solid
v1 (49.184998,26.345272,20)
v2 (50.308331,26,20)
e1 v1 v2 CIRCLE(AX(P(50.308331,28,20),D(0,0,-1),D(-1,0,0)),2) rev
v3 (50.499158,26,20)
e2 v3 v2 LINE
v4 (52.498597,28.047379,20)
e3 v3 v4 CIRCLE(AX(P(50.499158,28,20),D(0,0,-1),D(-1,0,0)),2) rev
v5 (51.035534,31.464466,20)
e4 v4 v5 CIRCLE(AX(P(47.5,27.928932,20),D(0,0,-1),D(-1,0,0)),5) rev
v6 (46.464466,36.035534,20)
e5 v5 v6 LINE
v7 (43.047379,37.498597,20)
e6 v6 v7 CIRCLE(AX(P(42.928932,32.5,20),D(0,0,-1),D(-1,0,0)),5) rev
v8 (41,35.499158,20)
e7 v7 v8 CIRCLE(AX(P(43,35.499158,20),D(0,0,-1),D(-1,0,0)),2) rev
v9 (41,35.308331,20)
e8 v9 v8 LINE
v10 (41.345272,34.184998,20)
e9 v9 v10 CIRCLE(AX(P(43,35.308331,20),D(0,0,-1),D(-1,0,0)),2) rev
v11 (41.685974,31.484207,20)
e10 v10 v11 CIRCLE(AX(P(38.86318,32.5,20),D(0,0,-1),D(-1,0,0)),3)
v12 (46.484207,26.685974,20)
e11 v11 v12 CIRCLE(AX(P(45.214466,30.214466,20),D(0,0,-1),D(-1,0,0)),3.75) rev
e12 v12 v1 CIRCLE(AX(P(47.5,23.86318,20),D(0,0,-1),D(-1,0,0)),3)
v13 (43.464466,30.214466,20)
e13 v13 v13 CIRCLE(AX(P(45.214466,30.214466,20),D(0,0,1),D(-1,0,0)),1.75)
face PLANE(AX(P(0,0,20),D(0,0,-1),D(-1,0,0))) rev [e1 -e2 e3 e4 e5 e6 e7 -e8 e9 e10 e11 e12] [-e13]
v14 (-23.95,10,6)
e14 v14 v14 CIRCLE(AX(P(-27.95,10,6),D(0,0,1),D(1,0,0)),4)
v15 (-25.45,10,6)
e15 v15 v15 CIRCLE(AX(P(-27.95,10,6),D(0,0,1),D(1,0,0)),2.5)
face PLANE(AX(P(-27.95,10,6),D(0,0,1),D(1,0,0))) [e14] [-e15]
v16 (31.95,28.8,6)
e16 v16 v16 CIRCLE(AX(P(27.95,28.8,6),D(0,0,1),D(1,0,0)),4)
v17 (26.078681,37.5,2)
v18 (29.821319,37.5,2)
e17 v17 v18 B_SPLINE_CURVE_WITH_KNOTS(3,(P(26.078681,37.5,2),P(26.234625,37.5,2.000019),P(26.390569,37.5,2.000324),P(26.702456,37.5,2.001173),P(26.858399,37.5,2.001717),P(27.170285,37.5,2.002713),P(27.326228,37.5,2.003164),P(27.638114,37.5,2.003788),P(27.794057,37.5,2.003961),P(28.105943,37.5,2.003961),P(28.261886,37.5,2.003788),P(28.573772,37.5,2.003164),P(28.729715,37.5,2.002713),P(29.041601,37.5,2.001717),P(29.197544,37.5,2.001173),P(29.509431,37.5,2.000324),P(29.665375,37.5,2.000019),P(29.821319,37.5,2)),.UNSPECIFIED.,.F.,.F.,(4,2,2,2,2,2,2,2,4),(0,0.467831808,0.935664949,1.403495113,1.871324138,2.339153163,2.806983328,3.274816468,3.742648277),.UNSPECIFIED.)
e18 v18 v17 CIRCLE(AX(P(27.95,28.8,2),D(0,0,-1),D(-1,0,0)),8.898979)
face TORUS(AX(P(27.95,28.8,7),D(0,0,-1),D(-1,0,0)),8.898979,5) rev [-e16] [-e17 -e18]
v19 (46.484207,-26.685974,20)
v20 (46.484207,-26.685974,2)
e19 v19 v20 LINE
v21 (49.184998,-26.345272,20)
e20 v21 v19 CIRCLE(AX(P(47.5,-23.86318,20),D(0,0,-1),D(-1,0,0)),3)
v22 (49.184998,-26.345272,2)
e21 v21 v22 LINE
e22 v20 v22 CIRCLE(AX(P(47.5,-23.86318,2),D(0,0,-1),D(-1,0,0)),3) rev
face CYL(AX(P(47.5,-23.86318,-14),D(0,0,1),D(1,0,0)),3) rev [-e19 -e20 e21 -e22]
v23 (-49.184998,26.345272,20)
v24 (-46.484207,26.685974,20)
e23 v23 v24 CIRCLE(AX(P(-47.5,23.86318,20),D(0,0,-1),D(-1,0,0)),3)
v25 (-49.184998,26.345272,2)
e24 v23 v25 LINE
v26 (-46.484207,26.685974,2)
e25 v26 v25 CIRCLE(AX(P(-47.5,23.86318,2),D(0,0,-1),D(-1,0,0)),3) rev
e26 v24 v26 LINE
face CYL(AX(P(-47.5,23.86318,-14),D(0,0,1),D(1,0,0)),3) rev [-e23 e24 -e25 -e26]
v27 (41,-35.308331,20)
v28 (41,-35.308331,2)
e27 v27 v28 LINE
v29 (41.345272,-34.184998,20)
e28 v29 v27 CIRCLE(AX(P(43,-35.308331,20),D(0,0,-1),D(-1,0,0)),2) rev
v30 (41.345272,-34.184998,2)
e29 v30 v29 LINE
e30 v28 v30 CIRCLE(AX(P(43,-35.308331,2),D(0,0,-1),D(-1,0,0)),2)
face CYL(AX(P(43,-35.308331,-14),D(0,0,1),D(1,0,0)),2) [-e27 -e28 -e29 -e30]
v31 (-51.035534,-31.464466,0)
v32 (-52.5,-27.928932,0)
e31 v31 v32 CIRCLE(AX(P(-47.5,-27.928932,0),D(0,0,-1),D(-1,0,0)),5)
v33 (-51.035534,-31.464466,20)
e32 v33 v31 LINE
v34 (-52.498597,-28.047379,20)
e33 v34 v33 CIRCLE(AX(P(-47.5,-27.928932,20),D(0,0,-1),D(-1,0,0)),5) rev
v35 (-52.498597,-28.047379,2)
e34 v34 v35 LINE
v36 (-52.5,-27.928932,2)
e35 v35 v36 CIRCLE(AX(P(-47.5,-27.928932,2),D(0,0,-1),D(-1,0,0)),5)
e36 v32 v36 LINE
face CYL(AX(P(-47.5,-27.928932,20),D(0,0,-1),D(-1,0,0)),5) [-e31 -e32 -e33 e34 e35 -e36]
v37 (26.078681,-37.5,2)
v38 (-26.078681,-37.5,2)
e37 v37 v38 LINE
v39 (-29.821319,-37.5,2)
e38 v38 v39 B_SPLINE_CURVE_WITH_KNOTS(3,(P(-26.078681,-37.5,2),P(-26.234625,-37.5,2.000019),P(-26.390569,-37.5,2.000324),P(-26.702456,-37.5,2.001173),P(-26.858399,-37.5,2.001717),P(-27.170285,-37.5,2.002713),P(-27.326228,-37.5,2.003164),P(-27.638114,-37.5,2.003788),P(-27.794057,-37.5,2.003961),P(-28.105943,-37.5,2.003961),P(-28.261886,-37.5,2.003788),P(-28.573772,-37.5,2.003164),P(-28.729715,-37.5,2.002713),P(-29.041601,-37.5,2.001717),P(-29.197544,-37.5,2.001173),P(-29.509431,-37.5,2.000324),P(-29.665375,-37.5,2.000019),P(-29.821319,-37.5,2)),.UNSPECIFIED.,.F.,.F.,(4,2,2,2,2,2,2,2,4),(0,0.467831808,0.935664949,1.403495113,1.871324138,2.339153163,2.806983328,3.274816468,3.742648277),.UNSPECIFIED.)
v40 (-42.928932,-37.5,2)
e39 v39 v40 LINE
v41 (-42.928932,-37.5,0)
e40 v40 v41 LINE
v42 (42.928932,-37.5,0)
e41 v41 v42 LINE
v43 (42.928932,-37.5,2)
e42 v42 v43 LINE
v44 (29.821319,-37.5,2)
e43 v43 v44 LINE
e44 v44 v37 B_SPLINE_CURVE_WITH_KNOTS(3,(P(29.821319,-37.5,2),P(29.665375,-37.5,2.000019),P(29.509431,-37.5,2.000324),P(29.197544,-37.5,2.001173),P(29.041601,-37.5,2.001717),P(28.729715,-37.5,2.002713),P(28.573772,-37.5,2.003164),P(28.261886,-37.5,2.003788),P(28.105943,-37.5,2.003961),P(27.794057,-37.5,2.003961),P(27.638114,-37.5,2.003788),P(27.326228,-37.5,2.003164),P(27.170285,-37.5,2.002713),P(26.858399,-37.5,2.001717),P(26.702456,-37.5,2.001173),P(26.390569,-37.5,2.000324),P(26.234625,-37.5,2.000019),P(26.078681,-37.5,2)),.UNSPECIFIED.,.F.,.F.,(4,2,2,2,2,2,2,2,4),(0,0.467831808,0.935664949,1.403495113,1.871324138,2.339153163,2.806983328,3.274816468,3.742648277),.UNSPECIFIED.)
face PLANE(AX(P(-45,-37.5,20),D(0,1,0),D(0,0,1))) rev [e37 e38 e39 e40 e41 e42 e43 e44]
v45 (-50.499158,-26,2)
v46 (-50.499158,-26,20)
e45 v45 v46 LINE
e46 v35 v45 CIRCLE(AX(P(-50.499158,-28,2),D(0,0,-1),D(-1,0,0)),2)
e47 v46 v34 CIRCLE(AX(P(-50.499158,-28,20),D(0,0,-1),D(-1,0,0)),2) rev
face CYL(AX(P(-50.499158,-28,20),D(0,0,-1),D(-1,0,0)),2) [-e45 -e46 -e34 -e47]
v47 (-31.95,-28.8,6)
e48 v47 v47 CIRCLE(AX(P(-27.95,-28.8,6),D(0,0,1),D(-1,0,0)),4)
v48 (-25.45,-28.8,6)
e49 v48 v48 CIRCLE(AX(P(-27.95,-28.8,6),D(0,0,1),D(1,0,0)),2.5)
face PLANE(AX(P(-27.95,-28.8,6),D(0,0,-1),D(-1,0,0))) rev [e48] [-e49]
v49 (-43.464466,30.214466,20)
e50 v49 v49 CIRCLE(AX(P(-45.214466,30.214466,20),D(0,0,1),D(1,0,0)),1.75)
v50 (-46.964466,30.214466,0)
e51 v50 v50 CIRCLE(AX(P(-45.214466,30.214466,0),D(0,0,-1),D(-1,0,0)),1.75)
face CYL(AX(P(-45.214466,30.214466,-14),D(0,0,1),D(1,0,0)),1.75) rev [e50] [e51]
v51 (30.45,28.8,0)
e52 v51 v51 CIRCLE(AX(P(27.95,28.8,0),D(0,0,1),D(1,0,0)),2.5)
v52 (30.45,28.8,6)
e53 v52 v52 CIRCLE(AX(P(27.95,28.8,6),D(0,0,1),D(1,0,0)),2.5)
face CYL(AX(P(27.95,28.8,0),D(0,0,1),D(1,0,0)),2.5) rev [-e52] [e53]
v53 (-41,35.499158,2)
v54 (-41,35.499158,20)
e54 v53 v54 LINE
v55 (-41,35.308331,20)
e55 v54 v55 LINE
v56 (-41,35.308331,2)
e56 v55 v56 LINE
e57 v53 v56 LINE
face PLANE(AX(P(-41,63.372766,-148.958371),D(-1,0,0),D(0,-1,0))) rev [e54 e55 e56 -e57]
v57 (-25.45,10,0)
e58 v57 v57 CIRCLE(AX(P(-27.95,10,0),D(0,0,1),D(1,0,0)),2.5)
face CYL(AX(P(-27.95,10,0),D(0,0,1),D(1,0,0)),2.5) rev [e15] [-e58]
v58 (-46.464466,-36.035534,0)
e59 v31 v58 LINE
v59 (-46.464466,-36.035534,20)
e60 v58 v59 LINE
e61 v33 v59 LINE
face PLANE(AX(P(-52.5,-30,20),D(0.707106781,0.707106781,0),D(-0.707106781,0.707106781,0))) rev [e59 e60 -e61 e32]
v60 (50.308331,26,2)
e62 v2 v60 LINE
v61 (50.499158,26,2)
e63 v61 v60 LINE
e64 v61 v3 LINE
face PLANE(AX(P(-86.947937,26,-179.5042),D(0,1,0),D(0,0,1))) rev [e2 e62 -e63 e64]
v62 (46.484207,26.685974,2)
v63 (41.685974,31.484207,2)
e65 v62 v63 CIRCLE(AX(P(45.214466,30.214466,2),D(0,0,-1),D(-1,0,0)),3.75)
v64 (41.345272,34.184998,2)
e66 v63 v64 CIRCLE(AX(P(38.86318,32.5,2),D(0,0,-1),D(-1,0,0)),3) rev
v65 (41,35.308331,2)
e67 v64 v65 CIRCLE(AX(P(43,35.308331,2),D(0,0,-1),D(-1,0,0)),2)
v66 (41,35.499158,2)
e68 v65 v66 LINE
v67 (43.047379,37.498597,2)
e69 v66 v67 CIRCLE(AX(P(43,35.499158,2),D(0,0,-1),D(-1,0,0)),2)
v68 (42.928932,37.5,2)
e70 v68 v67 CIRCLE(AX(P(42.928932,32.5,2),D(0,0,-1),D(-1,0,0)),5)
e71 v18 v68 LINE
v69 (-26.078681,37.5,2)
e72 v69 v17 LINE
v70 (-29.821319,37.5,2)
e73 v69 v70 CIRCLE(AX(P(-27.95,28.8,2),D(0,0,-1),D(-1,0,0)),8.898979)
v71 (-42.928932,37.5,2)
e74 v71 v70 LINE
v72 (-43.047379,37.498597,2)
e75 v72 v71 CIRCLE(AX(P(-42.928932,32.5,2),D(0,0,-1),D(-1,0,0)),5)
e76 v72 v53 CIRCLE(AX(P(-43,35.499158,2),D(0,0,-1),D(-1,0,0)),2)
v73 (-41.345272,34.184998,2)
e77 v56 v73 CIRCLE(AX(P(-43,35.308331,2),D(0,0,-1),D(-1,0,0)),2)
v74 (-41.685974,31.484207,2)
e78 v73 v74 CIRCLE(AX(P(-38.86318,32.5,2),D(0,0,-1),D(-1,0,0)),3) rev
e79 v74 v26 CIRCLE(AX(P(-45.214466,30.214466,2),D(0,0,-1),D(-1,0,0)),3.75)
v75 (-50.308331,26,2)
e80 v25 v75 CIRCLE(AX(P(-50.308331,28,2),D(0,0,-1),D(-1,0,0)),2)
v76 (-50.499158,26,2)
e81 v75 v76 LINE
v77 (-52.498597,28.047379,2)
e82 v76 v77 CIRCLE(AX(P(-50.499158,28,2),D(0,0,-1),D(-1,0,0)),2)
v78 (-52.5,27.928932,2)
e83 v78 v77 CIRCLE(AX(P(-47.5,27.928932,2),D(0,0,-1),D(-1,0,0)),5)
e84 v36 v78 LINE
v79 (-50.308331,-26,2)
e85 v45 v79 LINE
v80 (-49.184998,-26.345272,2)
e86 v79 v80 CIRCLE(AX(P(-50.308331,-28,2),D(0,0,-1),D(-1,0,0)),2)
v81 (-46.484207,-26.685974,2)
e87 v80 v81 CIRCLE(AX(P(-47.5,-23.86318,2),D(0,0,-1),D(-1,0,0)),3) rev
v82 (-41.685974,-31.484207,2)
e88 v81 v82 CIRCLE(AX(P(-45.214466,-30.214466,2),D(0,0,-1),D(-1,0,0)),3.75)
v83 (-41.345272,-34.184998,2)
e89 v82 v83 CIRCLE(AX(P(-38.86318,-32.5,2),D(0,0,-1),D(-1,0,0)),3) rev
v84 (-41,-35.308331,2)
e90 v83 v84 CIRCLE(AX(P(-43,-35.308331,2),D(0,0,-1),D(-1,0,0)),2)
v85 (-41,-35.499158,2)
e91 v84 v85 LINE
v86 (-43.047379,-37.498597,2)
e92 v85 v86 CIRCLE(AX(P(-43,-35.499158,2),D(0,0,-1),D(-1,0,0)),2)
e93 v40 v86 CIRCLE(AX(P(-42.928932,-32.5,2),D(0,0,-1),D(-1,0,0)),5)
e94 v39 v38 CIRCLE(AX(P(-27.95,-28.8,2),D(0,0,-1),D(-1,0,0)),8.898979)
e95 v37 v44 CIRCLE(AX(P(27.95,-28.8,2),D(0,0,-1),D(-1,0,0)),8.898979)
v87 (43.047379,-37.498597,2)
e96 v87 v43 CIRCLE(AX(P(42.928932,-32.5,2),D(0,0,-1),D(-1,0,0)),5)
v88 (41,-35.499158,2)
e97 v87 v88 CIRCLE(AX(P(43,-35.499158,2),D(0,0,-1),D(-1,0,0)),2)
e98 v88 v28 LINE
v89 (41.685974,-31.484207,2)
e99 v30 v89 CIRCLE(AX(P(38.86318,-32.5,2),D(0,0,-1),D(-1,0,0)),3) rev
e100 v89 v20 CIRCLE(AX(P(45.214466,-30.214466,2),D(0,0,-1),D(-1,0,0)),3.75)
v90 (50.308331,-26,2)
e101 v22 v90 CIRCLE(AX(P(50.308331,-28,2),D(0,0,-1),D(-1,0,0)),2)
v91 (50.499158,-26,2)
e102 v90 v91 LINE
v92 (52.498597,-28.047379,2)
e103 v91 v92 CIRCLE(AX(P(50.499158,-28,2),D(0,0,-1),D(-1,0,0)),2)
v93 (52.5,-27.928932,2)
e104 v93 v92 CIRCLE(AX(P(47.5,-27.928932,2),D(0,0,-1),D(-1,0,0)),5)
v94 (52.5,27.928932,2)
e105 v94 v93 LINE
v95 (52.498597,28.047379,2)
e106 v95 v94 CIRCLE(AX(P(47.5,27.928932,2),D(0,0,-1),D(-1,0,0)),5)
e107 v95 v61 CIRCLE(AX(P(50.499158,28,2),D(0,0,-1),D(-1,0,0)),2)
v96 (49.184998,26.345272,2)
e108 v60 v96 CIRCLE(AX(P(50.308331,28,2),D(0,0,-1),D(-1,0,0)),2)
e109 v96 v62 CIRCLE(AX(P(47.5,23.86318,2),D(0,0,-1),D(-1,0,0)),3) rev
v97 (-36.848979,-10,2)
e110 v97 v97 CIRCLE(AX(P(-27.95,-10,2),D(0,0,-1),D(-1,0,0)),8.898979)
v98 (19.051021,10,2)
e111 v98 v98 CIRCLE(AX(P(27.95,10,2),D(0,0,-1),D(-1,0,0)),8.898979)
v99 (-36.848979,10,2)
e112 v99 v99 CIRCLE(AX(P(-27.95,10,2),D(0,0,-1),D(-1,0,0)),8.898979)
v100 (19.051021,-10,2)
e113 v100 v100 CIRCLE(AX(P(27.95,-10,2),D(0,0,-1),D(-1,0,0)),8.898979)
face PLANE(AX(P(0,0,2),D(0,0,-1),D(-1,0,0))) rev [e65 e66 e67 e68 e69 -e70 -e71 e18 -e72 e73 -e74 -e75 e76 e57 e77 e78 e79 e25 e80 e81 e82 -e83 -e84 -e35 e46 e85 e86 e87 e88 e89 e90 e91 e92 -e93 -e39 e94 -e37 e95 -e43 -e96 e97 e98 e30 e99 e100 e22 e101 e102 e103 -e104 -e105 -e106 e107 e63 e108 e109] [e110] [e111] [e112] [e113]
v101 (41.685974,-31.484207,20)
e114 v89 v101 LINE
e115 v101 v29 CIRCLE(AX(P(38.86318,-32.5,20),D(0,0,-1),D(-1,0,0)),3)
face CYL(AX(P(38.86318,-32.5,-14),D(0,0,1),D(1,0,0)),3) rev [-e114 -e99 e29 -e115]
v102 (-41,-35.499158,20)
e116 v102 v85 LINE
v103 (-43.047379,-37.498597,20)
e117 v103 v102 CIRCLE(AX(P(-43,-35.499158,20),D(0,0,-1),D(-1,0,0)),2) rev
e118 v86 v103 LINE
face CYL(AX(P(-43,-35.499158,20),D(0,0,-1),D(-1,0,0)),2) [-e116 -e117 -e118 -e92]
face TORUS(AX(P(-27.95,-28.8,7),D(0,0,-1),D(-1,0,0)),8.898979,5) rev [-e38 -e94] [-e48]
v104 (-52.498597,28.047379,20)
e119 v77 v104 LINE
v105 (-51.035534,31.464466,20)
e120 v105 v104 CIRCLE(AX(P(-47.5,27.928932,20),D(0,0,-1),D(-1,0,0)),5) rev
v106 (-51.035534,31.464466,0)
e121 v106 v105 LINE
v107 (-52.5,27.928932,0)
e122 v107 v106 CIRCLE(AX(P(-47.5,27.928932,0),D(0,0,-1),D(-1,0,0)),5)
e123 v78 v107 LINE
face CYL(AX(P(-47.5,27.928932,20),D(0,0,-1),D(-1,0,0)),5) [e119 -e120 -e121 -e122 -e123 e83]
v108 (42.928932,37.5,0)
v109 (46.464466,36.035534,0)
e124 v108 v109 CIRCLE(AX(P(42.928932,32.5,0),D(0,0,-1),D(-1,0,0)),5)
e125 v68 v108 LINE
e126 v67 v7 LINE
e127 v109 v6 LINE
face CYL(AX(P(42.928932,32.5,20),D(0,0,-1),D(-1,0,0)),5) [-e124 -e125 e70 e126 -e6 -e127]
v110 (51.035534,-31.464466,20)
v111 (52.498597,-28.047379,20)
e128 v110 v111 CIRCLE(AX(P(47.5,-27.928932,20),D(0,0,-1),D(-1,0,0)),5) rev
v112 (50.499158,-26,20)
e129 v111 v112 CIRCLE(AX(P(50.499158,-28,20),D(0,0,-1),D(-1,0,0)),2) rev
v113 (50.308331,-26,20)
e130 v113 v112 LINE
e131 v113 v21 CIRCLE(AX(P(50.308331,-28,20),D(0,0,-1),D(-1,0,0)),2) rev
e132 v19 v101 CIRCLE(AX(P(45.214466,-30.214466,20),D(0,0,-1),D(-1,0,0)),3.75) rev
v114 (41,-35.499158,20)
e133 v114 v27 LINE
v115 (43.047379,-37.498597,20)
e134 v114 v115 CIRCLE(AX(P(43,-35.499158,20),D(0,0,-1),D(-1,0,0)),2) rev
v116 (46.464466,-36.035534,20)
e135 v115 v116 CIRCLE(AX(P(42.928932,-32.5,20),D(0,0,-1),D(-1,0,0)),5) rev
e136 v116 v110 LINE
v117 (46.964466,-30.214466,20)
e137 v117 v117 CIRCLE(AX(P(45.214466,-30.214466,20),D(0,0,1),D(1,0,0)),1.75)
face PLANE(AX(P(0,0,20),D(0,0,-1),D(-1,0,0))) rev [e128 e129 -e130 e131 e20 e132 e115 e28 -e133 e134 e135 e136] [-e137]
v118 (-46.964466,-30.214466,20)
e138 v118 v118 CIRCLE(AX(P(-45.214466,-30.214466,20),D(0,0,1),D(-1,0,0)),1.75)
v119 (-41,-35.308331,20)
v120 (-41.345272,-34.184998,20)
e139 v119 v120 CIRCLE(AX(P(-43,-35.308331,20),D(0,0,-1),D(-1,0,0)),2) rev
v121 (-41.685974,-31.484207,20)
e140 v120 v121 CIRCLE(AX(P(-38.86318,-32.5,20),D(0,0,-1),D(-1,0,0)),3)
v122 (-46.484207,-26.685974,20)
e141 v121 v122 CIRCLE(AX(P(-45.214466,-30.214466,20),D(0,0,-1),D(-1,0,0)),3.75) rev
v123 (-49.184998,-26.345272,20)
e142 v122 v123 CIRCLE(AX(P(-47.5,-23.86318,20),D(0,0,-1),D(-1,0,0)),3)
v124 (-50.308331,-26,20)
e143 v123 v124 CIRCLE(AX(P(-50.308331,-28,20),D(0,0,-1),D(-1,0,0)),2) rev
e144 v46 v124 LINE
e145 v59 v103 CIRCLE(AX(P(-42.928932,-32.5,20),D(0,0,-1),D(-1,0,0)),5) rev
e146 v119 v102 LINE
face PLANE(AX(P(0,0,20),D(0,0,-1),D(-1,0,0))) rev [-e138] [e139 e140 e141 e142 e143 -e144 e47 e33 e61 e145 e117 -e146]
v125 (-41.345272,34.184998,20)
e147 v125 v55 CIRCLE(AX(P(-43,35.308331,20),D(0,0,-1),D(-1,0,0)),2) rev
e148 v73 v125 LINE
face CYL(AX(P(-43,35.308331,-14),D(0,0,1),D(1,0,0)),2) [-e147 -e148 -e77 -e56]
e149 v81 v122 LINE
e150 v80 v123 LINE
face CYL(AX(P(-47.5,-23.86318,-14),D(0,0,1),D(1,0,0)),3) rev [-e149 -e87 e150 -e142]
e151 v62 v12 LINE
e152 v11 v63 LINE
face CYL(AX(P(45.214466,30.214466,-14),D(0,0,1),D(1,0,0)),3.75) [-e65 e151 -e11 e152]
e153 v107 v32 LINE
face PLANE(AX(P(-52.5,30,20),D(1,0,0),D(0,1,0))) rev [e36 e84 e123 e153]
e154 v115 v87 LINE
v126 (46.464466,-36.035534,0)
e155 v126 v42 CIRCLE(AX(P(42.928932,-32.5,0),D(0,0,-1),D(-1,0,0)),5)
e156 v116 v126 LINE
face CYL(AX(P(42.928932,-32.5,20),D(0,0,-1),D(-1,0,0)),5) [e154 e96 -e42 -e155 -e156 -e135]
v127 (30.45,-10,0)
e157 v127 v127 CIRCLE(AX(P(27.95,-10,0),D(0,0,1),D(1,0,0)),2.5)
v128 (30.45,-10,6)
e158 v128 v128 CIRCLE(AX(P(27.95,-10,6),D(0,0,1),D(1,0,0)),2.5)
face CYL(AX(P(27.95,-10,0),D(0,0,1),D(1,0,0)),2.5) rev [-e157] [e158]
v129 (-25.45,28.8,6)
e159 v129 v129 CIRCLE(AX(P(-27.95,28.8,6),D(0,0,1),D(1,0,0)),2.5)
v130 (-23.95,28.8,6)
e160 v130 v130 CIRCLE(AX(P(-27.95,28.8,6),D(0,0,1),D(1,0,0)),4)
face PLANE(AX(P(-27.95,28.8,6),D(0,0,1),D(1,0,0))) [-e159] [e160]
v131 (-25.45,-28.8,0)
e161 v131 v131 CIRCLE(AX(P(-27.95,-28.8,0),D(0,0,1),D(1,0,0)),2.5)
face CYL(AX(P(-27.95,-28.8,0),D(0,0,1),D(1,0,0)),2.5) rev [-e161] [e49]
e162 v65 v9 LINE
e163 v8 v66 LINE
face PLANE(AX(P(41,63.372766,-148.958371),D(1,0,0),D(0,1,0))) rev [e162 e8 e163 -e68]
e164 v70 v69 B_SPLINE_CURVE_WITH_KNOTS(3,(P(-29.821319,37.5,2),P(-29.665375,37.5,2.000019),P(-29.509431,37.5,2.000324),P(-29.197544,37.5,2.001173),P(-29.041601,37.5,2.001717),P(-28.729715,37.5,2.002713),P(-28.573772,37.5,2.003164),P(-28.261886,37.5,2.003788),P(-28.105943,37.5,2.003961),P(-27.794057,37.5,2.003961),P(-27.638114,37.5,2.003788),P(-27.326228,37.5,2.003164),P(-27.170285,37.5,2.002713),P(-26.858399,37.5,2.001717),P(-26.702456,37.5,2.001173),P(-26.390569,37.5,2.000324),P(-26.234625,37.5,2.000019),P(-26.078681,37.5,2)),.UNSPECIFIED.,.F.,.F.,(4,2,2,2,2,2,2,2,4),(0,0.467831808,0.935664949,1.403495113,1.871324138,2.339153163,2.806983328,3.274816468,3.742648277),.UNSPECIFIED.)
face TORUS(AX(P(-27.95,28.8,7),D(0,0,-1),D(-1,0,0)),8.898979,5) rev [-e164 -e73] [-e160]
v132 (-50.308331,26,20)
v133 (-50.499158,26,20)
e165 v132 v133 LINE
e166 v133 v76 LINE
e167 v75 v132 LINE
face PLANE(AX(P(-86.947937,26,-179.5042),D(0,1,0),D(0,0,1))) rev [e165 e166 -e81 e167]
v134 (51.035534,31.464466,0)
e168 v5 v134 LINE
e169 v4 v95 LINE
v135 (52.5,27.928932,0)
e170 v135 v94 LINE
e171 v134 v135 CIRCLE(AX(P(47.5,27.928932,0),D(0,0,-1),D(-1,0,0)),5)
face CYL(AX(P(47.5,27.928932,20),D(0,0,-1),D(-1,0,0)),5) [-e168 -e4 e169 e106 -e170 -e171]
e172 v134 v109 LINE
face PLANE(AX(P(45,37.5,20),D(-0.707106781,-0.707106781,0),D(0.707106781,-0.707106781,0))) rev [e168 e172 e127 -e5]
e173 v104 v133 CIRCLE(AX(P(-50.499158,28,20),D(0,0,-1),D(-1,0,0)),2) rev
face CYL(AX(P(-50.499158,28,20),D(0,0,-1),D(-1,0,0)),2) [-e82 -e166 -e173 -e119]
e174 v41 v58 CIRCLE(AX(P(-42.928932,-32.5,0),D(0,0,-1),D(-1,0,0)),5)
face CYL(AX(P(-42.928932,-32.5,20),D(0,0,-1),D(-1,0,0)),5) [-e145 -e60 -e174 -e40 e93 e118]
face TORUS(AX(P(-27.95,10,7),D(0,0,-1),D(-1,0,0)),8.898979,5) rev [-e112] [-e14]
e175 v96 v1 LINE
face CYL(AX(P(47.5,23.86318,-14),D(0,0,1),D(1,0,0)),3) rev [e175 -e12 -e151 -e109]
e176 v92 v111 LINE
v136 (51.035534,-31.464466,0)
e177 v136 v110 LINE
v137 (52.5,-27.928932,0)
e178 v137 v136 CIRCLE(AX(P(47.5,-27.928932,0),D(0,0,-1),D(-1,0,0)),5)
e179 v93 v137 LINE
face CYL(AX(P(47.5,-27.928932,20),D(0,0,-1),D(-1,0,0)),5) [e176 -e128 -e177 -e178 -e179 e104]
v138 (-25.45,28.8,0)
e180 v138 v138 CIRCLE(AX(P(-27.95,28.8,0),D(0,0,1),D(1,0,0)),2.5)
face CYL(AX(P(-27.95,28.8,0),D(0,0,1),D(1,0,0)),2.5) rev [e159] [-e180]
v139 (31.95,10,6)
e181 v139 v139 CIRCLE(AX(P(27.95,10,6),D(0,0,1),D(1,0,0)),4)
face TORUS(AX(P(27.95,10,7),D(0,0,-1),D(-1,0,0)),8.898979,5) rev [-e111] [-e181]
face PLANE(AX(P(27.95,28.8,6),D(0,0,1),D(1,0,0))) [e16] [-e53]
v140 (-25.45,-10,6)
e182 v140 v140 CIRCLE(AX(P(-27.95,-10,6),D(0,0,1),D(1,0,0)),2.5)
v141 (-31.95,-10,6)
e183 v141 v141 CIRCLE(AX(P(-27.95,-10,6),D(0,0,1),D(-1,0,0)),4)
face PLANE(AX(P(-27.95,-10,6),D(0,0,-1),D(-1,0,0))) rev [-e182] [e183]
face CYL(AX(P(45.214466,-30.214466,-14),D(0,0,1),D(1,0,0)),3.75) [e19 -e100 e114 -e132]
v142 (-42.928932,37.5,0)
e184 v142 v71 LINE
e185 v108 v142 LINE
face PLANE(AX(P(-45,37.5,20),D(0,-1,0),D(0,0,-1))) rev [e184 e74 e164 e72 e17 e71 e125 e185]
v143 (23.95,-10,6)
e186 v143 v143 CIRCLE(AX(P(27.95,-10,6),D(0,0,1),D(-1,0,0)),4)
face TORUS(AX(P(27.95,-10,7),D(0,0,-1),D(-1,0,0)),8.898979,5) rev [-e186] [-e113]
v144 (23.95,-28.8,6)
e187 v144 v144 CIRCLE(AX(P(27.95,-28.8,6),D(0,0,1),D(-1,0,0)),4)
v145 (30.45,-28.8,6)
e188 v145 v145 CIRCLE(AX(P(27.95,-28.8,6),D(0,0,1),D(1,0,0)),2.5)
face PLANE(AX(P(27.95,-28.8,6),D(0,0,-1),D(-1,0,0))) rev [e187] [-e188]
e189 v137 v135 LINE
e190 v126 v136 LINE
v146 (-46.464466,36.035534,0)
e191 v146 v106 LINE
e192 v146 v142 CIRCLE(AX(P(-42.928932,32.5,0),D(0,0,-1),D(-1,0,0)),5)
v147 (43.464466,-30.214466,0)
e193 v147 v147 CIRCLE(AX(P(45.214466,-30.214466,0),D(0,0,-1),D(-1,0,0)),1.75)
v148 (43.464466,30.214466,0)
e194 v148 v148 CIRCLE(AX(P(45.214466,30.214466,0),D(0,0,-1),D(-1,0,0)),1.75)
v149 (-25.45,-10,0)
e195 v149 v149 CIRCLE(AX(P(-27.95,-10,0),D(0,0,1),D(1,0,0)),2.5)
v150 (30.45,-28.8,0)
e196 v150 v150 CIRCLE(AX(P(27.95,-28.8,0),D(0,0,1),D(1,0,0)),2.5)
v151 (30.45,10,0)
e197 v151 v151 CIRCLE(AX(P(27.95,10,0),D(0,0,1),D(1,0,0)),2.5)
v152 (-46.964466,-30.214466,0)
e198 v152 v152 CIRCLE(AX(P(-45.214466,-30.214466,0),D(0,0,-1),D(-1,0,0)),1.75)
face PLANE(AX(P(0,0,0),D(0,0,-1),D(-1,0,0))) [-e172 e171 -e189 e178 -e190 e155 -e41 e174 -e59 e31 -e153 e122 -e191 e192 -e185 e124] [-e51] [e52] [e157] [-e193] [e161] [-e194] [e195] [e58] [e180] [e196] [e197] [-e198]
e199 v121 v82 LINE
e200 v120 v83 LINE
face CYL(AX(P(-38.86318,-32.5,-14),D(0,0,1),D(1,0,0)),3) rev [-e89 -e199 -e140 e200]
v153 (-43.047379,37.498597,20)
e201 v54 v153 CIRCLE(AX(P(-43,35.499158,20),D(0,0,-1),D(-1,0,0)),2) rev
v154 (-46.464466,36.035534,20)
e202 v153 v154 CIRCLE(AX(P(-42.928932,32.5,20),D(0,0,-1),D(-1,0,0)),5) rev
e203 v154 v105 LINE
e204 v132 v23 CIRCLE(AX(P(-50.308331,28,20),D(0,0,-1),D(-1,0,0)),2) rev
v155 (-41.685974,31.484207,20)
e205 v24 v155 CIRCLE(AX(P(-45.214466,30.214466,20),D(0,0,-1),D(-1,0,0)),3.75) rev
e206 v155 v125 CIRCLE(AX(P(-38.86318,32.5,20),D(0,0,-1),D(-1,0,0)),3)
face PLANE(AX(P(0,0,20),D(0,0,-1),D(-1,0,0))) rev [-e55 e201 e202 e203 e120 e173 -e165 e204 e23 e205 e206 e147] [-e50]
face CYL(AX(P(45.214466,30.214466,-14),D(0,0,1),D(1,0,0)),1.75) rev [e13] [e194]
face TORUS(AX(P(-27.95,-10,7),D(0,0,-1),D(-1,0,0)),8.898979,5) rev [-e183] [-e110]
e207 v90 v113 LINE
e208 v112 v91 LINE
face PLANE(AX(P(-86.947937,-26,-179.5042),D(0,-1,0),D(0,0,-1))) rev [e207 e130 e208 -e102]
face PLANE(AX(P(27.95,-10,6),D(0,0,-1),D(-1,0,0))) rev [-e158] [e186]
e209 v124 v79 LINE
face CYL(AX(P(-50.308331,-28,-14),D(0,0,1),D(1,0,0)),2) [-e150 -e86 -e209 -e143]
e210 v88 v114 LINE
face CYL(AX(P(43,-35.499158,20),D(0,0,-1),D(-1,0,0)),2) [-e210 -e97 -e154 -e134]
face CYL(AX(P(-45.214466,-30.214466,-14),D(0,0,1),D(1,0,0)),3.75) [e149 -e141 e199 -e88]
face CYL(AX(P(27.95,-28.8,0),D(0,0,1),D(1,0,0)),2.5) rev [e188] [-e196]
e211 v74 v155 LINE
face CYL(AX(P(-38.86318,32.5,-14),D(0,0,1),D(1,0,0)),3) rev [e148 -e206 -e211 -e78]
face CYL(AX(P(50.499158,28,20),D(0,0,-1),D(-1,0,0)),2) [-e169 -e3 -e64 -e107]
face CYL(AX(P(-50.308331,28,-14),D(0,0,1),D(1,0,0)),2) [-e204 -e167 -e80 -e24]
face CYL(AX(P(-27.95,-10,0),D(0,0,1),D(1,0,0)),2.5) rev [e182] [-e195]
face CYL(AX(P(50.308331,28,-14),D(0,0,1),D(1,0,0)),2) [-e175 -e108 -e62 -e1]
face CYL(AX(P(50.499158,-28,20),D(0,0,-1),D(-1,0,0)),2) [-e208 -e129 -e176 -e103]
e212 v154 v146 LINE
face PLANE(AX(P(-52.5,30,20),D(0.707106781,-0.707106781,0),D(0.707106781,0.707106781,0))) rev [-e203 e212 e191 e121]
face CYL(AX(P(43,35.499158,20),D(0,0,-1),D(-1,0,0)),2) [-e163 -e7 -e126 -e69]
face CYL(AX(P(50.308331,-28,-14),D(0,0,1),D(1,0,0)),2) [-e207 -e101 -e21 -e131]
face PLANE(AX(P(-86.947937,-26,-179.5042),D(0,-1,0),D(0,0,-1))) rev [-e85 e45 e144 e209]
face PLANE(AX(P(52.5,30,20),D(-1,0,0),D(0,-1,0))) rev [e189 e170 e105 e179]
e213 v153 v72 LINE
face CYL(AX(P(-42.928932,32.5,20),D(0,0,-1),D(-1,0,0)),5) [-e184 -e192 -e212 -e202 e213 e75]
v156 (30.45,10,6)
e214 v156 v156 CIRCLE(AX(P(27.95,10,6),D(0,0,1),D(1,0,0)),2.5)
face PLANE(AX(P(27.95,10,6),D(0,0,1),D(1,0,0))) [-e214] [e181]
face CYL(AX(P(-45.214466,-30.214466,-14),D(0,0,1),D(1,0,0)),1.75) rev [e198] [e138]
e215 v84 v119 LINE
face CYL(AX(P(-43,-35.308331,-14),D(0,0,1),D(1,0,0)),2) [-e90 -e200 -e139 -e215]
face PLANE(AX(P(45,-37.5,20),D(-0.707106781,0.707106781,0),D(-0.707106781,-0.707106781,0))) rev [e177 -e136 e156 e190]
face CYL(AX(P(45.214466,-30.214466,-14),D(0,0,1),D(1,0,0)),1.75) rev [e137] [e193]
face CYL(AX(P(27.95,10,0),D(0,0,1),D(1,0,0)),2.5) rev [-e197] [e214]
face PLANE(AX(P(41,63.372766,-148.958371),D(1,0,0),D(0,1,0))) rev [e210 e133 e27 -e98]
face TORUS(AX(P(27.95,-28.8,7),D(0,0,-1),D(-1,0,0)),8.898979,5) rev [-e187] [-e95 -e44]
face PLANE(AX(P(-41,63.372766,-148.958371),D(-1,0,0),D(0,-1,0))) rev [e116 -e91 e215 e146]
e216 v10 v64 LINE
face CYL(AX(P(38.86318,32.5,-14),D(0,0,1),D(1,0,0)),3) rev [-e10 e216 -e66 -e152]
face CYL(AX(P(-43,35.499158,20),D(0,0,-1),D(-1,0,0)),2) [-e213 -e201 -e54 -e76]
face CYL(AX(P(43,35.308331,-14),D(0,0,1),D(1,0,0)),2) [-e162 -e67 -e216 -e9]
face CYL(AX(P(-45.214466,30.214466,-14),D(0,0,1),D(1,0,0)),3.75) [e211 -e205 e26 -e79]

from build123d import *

# Parameters (mm, degrees)
EXTRUDE_1_DEPTH     = 20
SKETCH_2_R          = 1.75
CUT_EXTRUDE_1_DEPTH = 34
SHELL_1_T           = -2
FILLET_1_R          = 10
FILLET_2_R          = 3
FILLET_3_R          = 5
SKETCH_4_W          = 82
SKETCH_4_H          = 126.745531776
CUT_EXTRUDE_2_DEPTH = 18
FILLET_4_R          = 2
CUT_EXTRUDE_START   = -18
SKETCH_5_W          = 173.89587329
SKETCH_5_H          = 52
CUT_EXTRUDE_3_DEPTH = 18
FILLET_5_R          = 2
SKETCH_6_R          = 4
EXTRUDE_2_DEPTH     = 4
FILLET_6_R          = 5
SKETCH_7_R          = 2.5
CUT_EXTRUDE_4_DEPTH = 6


with BuildPart() as part:
    # Эскиз1 → Бобышка-Вытянуть1 (new body)
    with BuildSketch(Plane.XY):
        Polygon((-52.5, 30), (-45, 37.5), (45, 37.5), (52.5, 30), (52.5, -30), (45, -37.5), (-45, -37.5), (-52.5, -30), align=None)
    extrude(amount=EXTRUDE_1_DEPTH)

    # Эскиз2 → Вырез-Вытянуть1 (cut)
    with BuildSketch(Plane.XY.offset(20)):
        with Locations((-45.214466094, 30.214466094)):
            Circle(SKETCH_2_R)
        with Locations(Location((45.214466094, 30.214466094, 0), (0, 0, 180))):
            Circle(SKETCH_2_R)
        with Locations((45.214466094, -30.214466094)):
            Circle(SKETCH_2_R)
        with Locations(Location((-45.214466094, -30.214466094, 0), (0, 0, 180))):
            Circle(SKETCH_2_R)
    extrude(amount=-CUT_EXTRUDE_1_DEPTH, mode=Mode.SUBTRACT)

    # Оболочка1
    shell_1_openings = [part.faces().sort_by_distance(p)[0] for p in [
        (0, 0, 20),
    ]]
    offset(amount=SHELL_1_T, openings=shell_1_openings, kind=Kind.INTERSECTION)

    # Скругление1
    # the kernel refuses this fillet: 10 mm, written as the material it adds along each edge
    with BuildSketch(Plane(origin=(-45.74479618, -33.926776695, 2), x_dir=(0.7071067811865442, -0.7071067811865507, 0), z_dir=(0, 0, 1)), Plane(origin=(48.926776695, -30.74479618, 2), x_dir=(0.7071067811865482, 0.7071067811865467, 0), z_dir=(0, 0, 1)), Plane(origin=(45.74479618, 33.926776695, 2), x_dir=(-0.707106781186546, 0.7071067811865492, 0), z_dir=(0, 0, 1)), Plane(origin=(-48.926776695, 30.74479618, 2), x_dir=(-0.7071067811865508, -0.7071067811865444, 0), z_dir=(0, 0, 1))) as fillet_1_piece_1:
        with BuildLine():
            CenterArc((11.477032042, 3.794412555), FILLET_1_R, 183.312134334, 18.986942704)
            Line((1.493736012, 3.21665797), (1.294070091, 3.205102878))
            ThreePointArc((1.294070091, 3.205102878), (0.969771845, 1.504817982), (-0.12, 0.16))
            Line((-0.12, 0.16), (0, -0.2))
            ThreePointArc((0, -0.2), (1.112436867, -0.2), (2.039830568, -0.075888251))
            Line((2.039830568, -0.075888251), (2.224873734, 0))
        make_face()
    extrude(amount=18)
    with BuildSketch(Plane(origin=(-48.926776695, -30.74479618, 2), x_dir=(0.34351243985929386, 0.9391481265816991, 0), z_dir=(0, 0, 1)), Plane(origin=(45.74479618, -33.926776695, 2), x_dir=(-0.9391481265817004, 0.34351243985929, 0), z_dir=(0, 0, 1)), Plane(origin=(48.926776695, 30.74479618, 2), x_dir=(-0.3435124398592874, -0.9391481265817014, 0), z_dir=(0, 0, 1)), Plane(origin=(-45.74479618, 33.926776695, 2), x_dir=(0.9391481265817011, -0.34351243985928803, 0), z_dir=(0, 0, 1))) as fillet_1_piece_2:
        with BuildLine():
            CenterArc((8.275322434, 8.811292173), FILLET_1_R, 222.791938952, 18.986942704)
            Line((0.937067943, 2.017911495), (0.790302854, 1.882043882))
            ThreePointArc((0.790302854, 1.882043882), (0.287138375, 1.093191354), (-0.181395597, 0.084235607))
            Line((-0.181395597, 0.084235607), (0.094575114, -0.176225843))
            ThreePointArc((0.094575114, -0.176225843), (1.773283379, 0.245765435), (3.451991644, -0.176225843))
            Line((3.451991644, -0.176225843), (3.546566758, 0))
        make_face()
    extrude(amount=18)

    # Скругление2
    fillet_2_edges = [part.edges().sort_by_distance(p)[0] for p in [
        (-50.5, 29.171572875, 11),
        (-44.171572875, 35.5, 11),
        (-44.171572875, -35.5, 11),
        (-50.5, -29.171572875, 11),
        (44.171572875, -35.5, 11),
        (50.5, -29.171572875, 11),
        (50.5, 29.171572875, 11),
        (44.171572875, 35.5, 11),
    ]]
    fillet(fillet_2_edges, radius=FILLET_2_R)

    # Скругление3
    fillet_3_edges = [part.edges().sort_by_distance(p)[0] for p in [
        (45, 37.5, 10),
        (52.5, 30, 10),
        (52.5, -30, 10),
        (45, -37.5, 10),
        (-45, -37.5, 10),
        (-52.5, -30, 10),
        (-52.5, 30, 10),
        (-45, 37.5, 10),
    ]]
    fillet(fillet_3_edges, radius=FILLET_3_R)

    # Эскиз4 → Вырез-Вытянуть2 (cut)
    with BuildSketch(Plane.XY.offset(20)):
        Rectangle(SKETCH_4_W, SKETCH_4_H)
    extrude(amount=-CUT_EXTRUDE_2_DEPTH, mode=Mode.SUBTRACT)

    # Скругление4
    # the kernel refuses this fillet: 2 mm, written as the material it takes off along each edge
    with BuildSketch(Plane(origin=(41, -34.605706623, 2), x_dir=(0, -1, 0), z_dir=(0, 0, 1)), Plane(origin=(41, 34.605706623, 21.756559814), x_dir=(0, 1, 0), z_dir=(0, 0, -1))) as fillet_4_piece_1:
        with BuildLine():
            CenterArc((0.702623926, 2), FILLET_4_R, 235.828901177, 34.171098823)
            ThreePointArc((-0.420708294, 0.345272009), (-0.20250821, 0.18219615), (0, 0))
            Line((0, 0), (0.702623926, 0))
        make_face()
    extrude(amount=19.756559814, mode=Mode.SUBTRACT)
    with BuildSketch(Plane(origin=(41, -37.5, 25.118447555), x_dir=(0.9999997651545144, 0.0006853400003404547, 0), z_dir=(0, 0, -1)), Plane(origin=(-41, -37.5, 2), x_dir=(-0.9999997651545144, 0.0006853400003439418, 0), z_dir=(0, 0, 1)), Plane(origin=(41, 37.5, 2), x_dir=(0.9999997651545144, -0.0006853400003439394, 0), z_dir=(0, 0, 1))) as fillet_4_piece_2:
        with BuildLine():
            CenterArc((2.001370787, -1.999470741), FILLET_4_R, 88.681844886, 91.357422207)
            Line((0.001371257, -2.000841421), (-0.198628696, -2.000978489))
            Line((-0.198628696, -2.000978489), (-0.199999953, -0.000137068))
            Line((-0.199999953, -0.000137068), (-0.000137068, 0.199999953))
            ThreePointArc((-0.000137068, 0.199999953), (1.928794667, 0.201321927), (2.051979846, 0.199947074))
            Line((2.051979846, 0.199947074), (2.047379022, 0))
        make_face()
    extrude(amount=23.118447555, mode=Mode.SUBTRACT)
    with BuildSketch(Plane(origin=(-41, -34.605706623, 2), x_dir=(0, -1, 0), z_dir=(0, 0, 1))) as fillet_4_piece_3:
        with BuildLine():
            CenterArc((0.702623926, -2), FILLET_4_R, 90, 34.171098823)
            ThreePointArc((-0.420708294, -0.345272009), (-0.20250821, -0.18219615), (0, 0))
            Line((0, 0), (0.702623926, 0))
        make_face()
    extrude(amount=19.756559814, mode=Mode.SUBTRACT)
    with BuildSketch(Plane(origin=(-41, 34.605706623, 21.756559814), x_dir=(-0.6343994710236062, -0.7730053758965514, 0), z_dir=(0, 0, -1))) as fillet_4_piece_4:
        with BuildLine():
            CenterArc((0.72566687, 1.991754999), FILLET_4_R, 230.624541426, 34.171098823)
            Line((-0.543132072, 0.445744247), (0, 0))
            ThreePointArc((0, 0), (0.272125076, 0.012367502), (0.544250153, 0))
        make_face()
    extrude(amount=19.756559814, mode=Mode.SUBTRACT)
    with BuildSketch(Plane(origin=(-41, 37.5, 25.118447555), x_dir=(0, -1, 0), z_dir=(0, 0, -1))) as fillet_4_piece_5:
        with BuildLine():
            CenterArc((2.00084189, 2), FILLET_4_R, 178.642577793, 91.357422207)
            Line((0.001403151, 2.047378541), (-0.198540723, 2.052116395))
            ThreePointArc((-0.198540723, 2.052116395), (-0.2, 1.928932188), (-0.2, 0))
            Line((-0.2, 0), (0, -0.2))
            Line((0, -0.2), (2.00084189, -0.2))
            Line((2.00084189, -0.2), (2.00084189, 0))
        make_face()
    extrude(amount=23.118447555, mode=Mode.SUBTRACT)

    # Эскиз5 → Вырез-Вытянуть3 (cut)
    with BuildSketch(Plane.XY.offset(20).offset(CUT_EXTRUDE_START)):
        Rectangle(SKETCH_5_W, SKETCH_5_H)
    extrude(amount=CUT_EXTRUDE_3_DEPTH, mode=Mode.SUBTRACT)

    # Скругление5
    # the kernel refuses this fillet: 2 mm, written as the material it takes off along each edge
    with BuildSketch(Plane(origin=(49.605706623, -26, 21.756559814), x_dir=(1, 0, 0), z_dir=(0, 0, -1)), Plane(origin=(-49.605706623, -26, 2), x_dir=(-1, 0, 0), z_dir=(0, 0, 1))) as fillet_5_piece_1:
        with BuildLine():
            CenterArc((0.702623926, 2), FILLET_5_R, 235.828901177, 34.171098823)
            ThreePointArc((-0.420708294, 0.345272009), (-0.20250821, 0.18219615), (0, 0))
            Line((0, 0), (0.702623926, 0))
        make_face()
    extrude(amount=19.756559814, mode=Mode.SUBTRACT)
    with BuildSketch(Plane(origin=(52.5, -26, 25.118447555), x_dir=(-0.0006853400003439216, -0.9999997651545144, 0), z_dir=(0, 0, -1)), Plane(origin=(52.5, 26, 2), x_dir=(-0.0006853400003439287, 0.9999997651545144, 0), z_dir=(0, 0, 1)), Plane(origin=(-52.5, -26, 2), x_dir=(0.0006853400003439322, -0.9999997651545144, 0), z_dir=(0, 0, 1)), Plane(origin=(-52.5, 26, 25.118447555), x_dir=(0.0006853400003439264, 0.9999997651545144, 0), z_dir=(0, 0, -1))) as fillet_5_piece_2:
        with BuildLine():
            CenterArc((2.001370787, 1.999470741), FILLET_5_R, 179.960732907, 91.357422207)
            Line((0.001371257, 2.000841421), (-0.198628696, 2.000978489))
            Line((-0.198628696, 2.000978489), (-0.199999953, 0.000137068))
            Line((-0.199999953, 0.000137068), (-0.000137068, -0.199999953))
            ThreePointArc((-0.000137068, -0.199999953), (1.928794667, -0.201321927), (2.051979846, -0.199947074))
            Line((2.051979846, -0.199947074), (2.047379022, 0))
        make_face()
    extrude(amount=23.118447555, mode=Mode.SUBTRACT)
    with BuildSketch(Plane(origin=(49.605706623, 26, 21.756559814), x_dir=(-0.7730053758965525, 0.6343994710236047, 1.8308445150644594e-15), z_dir=(0, 0, -1))) as fillet_5_piece_3:
        with BuildLine():
            CenterArc((0.72566687, 1.991754999), FILLET_5_R, 230.624541426, 34.171098823)
            Line((-0.543132072, 0.445744247), (0, 0))
            ThreePointArc((0, 0), (0.272125076, 0.012367502), (0.544250153, 0))
        make_face()
    extrude(amount=19.756559814, mode=Mode.SUBTRACT)
    with BuildSketch(Plane(origin=(-49.605706623, 26, 2), x_dir=(-1, 0, 0), z_dir=(0, 0, 1))) as fillet_5_piece_4:
        with BuildLine():
            CenterArc((0.702623926, -2), FILLET_5_R, 90, 34.171098823)
            ThreePointArc((-0.420708294, -0.345272009), (-0.20250821, -0.18219615), (0, 0))
            Line((0, 0), (0.702623926, 0))
        make_face()
    extrude(amount=19.756559814, mode=Mode.SUBTRACT)

    # Эскиз6 → Бобышка-Вытянуть2 (add)
    with BuildSketch(Plane.XY.offset(2)):
        with Locations(Location((-27.95, 28.8, 0), (0, 0, 180))):
            Circle(SKETCH_6_R)
        with Locations(Location((27.95, 28.8, 0), (0, 0, 180))):
            Circle(SKETCH_6_R)
        with Locations(Location((27.95, 10, 0), (0, 0, 180))):
            Circle(SKETCH_6_R)
        with Locations(Location((-27.95, 10, 0), (0, 0, 180))):
            Circle(SKETCH_6_R)
        with Locations(Location((-27.95, -10, 0), (0, 0, 180))):
            Circle(SKETCH_6_R)
        with Locations(Location((27.95, -10, 0), (0, 0, 180))):
            Circle(SKETCH_6_R)
        with Locations(Location((27.95, -28.8, 0), (0, 0, 180))):
            Circle(SKETCH_6_R)
        with Locations(Location((-27.95, -28.8, 0), (0, 0, 180))):
            Circle(SKETCH_6_R)
    extrude(amount=EXTRUDE_2_DEPTH)

    # Скругление6
    # the kernel refuses this fillet: 5 mm, written as the material it adds along each edge
    with BuildSketch(Plane(origin=(-27.95, 28.8, 2), x_dir=(-1, 0, 0), z_dir=(0, 1, 0))) as fillet_6_piece_1_section:
        with BuildLine():
            CenterArc((8.898979486, 5), FILLET_6_R, 191.536959033, 78.463040967)
            Line((4, 4), (3.90202041, 3.98))
            ThreePointArc((3.90202041, 3.98), (3.9, 2), (3.9, 0))
            Line((3.9, 0), (4, -0.1))
            Line((4, -0.1), (8.898979486, -0.1))
            Line((8.898979486, -0.1), (8.898979486, 0))
        make_face()
    fillet_6_piece_1 = revolve(axis=Axis((-27.95, 28.8, 2), (0, 0, 1)), mode=Mode.PRIVATE)
    fillet_6_piece_1 = split(fillet_6_piece_1, bisect_by=Plane(origin=(-22.249530795, 37.5, 3.082640938), z_dir=(0, -1, 0)), keep=Keep.TOP, mode=Mode.PRIVATE)
    add(fillet_6_piece_1)
    with BuildSketch(Plane(origin=(27.95, 28.8, 2), x_dir=(-1, 0, 0), z_dir=(0, 1, 0))) as fillet_6_piece_2_section:
        with BuildLine():
            CenterArc((8.898979486, 5), FILLET_6_R, 191.536959033, 78.463040967)
            Line((4, 4), (3.90202041, 3.98))
            ThreePointArc((3.90202041, 3.98), (3.9, 2), (3.9, 0))
            Line((3.9, 0), (4, -0.1))
            Line((4, -0.1), (8.898979486, -0.1))
            Line((8.898979486, -0.1), (8.898979486, 0))
        make_face()
    fillet_6_piece_2 = revolve(axis=Axis((27.95, 28.8, 2), (0, 0, 1)), mode=Mode.PRIVATE)
    fillet_6_piece_2 = split(fillet_6_piece_2, bisect_by=Plane(origin=(33.650469205, 37.5, 3.082640938), z_dir=(0, -1, 0)), keep=Keep.TOP, mode=Mode.PRIVATE)
    add(fillet_6_piece_2)
    with BuildSketch(Plane(origin=(27.95, 10, 2), x_dir=(-1, 0, 0), z_dir=(0, 1, 0))) as fillet_6_piece_3:
        with BuildLine():
            CenterArc((8.898979486, 5), FILLET_6_R, 191.536959033, 78.463040967)
            Line((4, 4), (3.90202041, 3.98))
            ThreePointArc((3.90202041, 3.98), (3.9, 2), (3.9, 0))
            Line((3.9, 0), (4, -0.1))
            Line((4, -0.1), (8.898979486, -0.1))
            Line((8.898979486, -0.1), (8.898979486, 0))
        make_face()
    revolve(axis=Axis((27.95, 10, 2), (0, 0, 1)))
    with BuildSketch(Plane(origin=(-27.95, 10, 2), x_dir=(-1, 0, 0), z_dir=(0, 1, 0))) as fillet_6_piece_4:
        with BuildLine():
            CenterArc((8.898979486, 5), FILLET_6_R, 191.536959033, 78.463040967)
            Line((4, 4), (3.90202041, 3.98))
            ThreePointArc((3.90202041, 3.98), (3.9, 2), (3.9, 0))
            Line((3.9, 0), (4, -0.1))
            Line((4, -0.1), (8.898979486, -0.1))
            Line((8.898979486, -0.1), (8.898979486, 0))
        make_face()
    revolve(axis=Axis((-27.95, 10, 2), (0, 0, 1)))
    with BuildSketch(Plane(origin=(-27.95, -10, 2), x_dir=(-1, 0, 0), z_dir=(0, 1, 0))) as fillet_6_piece_5:
        with BuildLine():
            CenterArc((8.898979486, 5), FILLET_6_R, 191.536959033, 78.463040967)
            Line((4, 4), (3.90202041, 3.98))
            ThreePointArc((3.90202041, 3.98), (3.9, 2), (3.9, 0))
            Line((3.9, 0), (4, -0.1))
            Line((4, -0.1), (8.898979486, -0.1))
            Line((8.898979486, -0.1), (8.898979486, 0))
        make_face()
    revolve(axis=Axis((-27.95, -10, 2), (0, 0, 1)))
    with BuildSketch(Plane(origin=(27.95, -10, 2), x_dir=(-1, 0, 0), z_dir=(0, 1, 0))) as fillet_6_piece_6:
        with BuildLine():
            CenterArc((8.898979486, 5), FILLET_6_R, 191.536959033, 78.463040967)
            Line((4, 4), (3.90202041, 3.98))
            ThreePointArc((3.90202041, 3.98), (3.9, 2), (3.9, 0))
            Line((3.9, 0), (4, -0.1))
            Line((4, -0.1), (8.898979486, -0.1))
            Line((8.898979486, -0.1), (8.898979486, 0))
        make_face()
    revolve(axis=Axis((27.95, -10, 2), (0, 0, 1)))
    with BuildSketch(Plane(origin=(27.95, -28.8, 2), x_dir=(-1, 0, 0), z_dir=(0, 1, 0))) as fillet_6_piece_7_section:
        with BuildLine():
            CenterArc((8.898979486, 5), FILLET_6_R, 191.536959033, 78.463040967)
            Line((4, 4), (3.90202041, 3.98))
            ThreePointArc((3.90202041, 3.98), (3.9, 2), (3.9, 0))
            Line((3.9, 0), (4, -0.1))
            Line((4, -0.1), (8.898979486, -0.1))
            Line((8.898979486, -0.1), (8.898979486, 0))
        make_face()
    fillet_6_piece_7 = revolve(axis=Axis((27.95, -28.8, 2), (0, 0, 1)), mode=Mode.PRIVATE)
    fillet_6_piece_7 = split(fillet_6_piece_7, bisect_by=Plane(origin=(33.65046921, -37.5, 3.082640943), z_dir=(0, 1, 0)), keep=Keep.TOP, mode=Mode.PRIVATE)
    add(fillet_6_piece_7)
    with BuildSketch(Plane(origin=(-27.95, -28.8, 2), x_dir=(-1, 0, 0), z_dir=(0, 1, 0))) as fillet_6_piece_8_section:
        with BuildLine():
            CenterArc((8.898979486, 5), FILLET_6_R, 191.536959033, 78.463040967)
            Line((4, 4), (3.90202041, 3.98))
            ThreePointArc((3.90202041, 3.98), (3.9, 2), (3.9, 0))
            Line((3.9, 0), (4, -0.1))
            Line((4, -0.1), (8.898979486, -0.1))
            Line((8.898979486, -0.1), (8.898979486, 0))
        make_face()
    fillet_6_piece_8 = revolve(axis=Axis((-27.95, -28.8, 2), (0, 0, 1)), mode=Mode.PRIVATE)
    fillet_6_piece_8 = split(fillet_6_piece_8, bisect_by=Plane(origin=(-22.24953079, -37.5, 3.082640943), z_dir=(0, 1, 0)), keep=Keep.TOP, mode=Mode.PRIVATE)
    add(fillet_6_piece_8)

    # Эскиз7 → Вырез-Вытянуть4 (cut)
    with BuildSketch(Plane.XY.offset(6)):
        with Locations((-27.95, 28.8)):
            Circle(SKETCH_7_R)
        with Locations((27.95, 28.8)):
            Circle(SKETCH_7_R)
        with Locations((27.95, 10)):
            Circle(SKETCH_7_R)
        with Locations((-27.95, 10)):
            Circle(SKETCH_7_R)
        with Locations((-27.95, -10)):
            Circle(SKETCH_7_R)
        with Locations((27.95, -10)):
            Circle(SKETCH_7_R)
        with Locations((27.95, -28.8)):
            Circle(SKETCH_7_R)
        with Locations((-27.95, -28.8)):
            Circle(SKETCH_7_R)
    extrude(amount=-CUT_EXTRUDE_4_DEPTH, mode=Mode.SUBTRACT)


solid = part.part
